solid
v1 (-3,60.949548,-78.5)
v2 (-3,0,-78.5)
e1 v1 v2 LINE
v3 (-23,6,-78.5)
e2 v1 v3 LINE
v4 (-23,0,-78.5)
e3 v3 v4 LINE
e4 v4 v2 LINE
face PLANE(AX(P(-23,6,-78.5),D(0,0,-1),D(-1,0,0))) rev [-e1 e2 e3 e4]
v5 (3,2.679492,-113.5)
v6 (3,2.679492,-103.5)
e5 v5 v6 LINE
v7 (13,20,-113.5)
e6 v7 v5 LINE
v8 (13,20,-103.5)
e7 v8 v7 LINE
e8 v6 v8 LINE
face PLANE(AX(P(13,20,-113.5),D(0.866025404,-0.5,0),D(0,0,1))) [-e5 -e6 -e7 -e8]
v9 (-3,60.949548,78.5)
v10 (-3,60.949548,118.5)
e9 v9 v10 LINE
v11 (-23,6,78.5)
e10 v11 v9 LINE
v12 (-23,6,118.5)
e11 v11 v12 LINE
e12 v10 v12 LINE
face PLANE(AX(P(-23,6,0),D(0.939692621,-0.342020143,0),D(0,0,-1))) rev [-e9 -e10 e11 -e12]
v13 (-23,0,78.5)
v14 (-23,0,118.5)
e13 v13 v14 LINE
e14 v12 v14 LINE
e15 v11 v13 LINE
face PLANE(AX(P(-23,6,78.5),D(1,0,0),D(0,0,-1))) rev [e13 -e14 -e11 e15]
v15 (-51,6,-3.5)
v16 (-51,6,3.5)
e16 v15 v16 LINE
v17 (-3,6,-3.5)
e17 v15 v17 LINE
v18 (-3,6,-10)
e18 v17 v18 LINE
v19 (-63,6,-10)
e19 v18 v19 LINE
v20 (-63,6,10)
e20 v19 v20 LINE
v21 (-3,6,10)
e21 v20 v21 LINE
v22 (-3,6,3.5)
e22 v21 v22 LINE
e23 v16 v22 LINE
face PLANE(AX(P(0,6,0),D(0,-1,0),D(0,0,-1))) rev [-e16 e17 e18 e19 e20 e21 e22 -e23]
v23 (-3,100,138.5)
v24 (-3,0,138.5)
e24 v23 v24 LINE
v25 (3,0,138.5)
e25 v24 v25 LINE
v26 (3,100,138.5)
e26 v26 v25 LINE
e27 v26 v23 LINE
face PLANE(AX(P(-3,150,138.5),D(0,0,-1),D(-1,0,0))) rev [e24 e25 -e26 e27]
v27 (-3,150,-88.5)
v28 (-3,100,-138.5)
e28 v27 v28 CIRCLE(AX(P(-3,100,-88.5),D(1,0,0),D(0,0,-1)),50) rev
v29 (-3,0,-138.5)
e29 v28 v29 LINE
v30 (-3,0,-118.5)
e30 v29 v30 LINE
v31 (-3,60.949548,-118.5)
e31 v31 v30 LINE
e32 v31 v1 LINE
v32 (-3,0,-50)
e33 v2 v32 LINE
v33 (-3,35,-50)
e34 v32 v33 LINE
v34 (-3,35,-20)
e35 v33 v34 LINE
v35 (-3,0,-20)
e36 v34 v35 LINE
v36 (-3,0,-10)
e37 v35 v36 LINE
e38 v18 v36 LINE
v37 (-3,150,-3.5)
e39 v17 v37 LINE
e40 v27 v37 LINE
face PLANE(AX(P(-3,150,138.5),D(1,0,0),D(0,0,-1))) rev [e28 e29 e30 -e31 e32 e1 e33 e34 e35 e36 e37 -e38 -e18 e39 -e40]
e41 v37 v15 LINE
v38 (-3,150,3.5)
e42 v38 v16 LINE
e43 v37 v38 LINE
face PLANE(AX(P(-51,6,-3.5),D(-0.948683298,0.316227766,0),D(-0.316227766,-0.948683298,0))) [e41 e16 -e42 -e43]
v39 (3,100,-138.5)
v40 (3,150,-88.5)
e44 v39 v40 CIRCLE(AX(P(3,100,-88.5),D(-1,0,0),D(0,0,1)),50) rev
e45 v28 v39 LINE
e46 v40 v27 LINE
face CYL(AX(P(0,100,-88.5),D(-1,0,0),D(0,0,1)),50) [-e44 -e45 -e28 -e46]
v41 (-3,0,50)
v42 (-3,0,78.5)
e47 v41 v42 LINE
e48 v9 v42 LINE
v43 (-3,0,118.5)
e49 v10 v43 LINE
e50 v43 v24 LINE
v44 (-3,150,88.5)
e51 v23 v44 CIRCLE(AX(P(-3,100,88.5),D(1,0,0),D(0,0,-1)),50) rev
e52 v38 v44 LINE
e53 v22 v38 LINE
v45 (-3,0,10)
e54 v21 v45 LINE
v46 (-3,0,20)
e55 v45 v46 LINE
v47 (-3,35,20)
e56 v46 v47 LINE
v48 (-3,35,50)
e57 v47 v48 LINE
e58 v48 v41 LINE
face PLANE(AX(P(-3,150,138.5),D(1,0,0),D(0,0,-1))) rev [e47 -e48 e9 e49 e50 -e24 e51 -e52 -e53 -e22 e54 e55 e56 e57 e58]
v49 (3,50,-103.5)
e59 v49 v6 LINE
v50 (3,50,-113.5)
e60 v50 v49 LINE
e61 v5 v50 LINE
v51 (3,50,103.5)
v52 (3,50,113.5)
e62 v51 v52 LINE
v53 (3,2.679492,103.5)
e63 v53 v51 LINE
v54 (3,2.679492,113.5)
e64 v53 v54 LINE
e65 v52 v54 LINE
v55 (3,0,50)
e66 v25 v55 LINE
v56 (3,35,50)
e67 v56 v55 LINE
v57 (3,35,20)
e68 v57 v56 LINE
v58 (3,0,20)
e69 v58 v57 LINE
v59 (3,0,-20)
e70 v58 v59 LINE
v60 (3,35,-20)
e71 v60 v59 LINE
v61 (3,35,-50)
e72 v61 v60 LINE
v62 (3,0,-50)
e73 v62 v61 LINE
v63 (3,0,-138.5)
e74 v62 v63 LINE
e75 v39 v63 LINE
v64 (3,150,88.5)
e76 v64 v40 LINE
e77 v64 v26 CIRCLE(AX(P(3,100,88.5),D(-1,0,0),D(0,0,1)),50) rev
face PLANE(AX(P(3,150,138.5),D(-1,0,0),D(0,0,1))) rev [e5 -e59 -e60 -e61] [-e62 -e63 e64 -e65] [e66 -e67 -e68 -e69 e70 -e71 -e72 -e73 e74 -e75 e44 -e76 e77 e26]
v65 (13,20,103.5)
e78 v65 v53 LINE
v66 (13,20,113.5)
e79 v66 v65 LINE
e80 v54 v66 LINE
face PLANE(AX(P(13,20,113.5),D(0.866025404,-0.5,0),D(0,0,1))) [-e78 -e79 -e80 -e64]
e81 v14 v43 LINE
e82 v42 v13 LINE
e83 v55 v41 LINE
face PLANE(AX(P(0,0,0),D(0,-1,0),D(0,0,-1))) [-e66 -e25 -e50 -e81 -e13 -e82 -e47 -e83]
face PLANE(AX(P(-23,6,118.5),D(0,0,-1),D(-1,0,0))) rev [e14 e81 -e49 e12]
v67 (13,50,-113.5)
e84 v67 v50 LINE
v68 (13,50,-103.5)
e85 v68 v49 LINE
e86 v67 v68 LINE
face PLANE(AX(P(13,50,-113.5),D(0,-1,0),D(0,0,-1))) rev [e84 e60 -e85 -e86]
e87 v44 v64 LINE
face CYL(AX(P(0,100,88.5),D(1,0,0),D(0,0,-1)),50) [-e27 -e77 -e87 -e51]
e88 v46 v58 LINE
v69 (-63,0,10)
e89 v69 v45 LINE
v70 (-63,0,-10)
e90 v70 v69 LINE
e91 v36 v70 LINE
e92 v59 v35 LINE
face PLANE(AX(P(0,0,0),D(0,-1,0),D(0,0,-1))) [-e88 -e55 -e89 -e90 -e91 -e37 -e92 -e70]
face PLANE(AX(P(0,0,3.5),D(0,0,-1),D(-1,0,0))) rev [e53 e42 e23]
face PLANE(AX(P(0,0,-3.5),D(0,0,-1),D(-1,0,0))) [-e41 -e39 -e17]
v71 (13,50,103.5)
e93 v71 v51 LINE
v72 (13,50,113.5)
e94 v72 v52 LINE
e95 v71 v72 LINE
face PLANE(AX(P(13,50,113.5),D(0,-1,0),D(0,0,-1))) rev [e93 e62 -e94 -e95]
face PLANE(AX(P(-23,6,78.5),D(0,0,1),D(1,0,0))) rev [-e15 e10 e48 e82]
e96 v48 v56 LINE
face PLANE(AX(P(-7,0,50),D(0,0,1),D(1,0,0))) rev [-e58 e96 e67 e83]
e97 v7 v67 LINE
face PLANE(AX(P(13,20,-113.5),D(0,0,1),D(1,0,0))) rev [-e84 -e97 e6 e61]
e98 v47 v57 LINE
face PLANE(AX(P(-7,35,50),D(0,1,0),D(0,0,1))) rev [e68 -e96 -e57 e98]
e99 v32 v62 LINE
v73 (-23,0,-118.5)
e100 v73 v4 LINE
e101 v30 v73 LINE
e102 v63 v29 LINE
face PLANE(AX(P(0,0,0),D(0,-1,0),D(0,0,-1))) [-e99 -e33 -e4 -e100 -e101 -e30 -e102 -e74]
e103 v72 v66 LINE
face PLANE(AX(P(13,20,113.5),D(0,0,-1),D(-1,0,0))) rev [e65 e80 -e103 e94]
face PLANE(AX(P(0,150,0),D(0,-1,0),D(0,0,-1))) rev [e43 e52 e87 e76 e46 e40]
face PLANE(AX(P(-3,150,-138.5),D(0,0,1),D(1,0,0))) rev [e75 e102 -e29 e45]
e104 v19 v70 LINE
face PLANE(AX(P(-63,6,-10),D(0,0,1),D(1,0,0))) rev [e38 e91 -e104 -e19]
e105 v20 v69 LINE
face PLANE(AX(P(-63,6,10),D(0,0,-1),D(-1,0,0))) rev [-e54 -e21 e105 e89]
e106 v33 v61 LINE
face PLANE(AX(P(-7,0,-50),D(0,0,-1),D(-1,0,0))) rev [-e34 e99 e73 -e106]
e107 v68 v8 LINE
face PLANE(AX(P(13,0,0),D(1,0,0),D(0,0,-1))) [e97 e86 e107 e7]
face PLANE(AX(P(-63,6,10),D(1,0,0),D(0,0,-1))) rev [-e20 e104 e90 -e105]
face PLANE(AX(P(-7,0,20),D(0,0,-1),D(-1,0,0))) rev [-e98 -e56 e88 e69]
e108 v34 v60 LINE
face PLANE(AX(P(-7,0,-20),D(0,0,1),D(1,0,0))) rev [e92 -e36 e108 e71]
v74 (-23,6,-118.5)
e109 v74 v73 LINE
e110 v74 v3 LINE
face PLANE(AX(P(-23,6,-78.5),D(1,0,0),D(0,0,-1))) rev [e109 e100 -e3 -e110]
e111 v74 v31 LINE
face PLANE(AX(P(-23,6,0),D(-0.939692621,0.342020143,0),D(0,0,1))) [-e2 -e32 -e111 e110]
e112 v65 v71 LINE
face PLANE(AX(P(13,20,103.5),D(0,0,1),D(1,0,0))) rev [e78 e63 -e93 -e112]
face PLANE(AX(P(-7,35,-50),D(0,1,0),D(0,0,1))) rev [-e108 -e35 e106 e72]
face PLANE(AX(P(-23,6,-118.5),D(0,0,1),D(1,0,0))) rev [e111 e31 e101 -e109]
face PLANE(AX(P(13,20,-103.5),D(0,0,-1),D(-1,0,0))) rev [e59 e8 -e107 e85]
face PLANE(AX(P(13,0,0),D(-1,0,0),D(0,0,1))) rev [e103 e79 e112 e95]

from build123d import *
from OCP.BRepFilletAPI import BRepFilletAPI_MakeChamfer

# Parameters (mm, degrees)
SKETCH_1_W          = 6
SKETCH_1_H          = 277
EXTRUDE_1_DEPTH     = 150
SKETCH_2_W          = 20
SKETCH_2_H          = 40
SKETCH_2_W_2        = 60
SKETCH_2_H_2        = 20
EXTRUDE_2_DEPTH     = 6
EXTRUDE_3_DEPTH     = 7
CHAMFER_2_SIZE      = 54.949548389
CHAMFER_2_SIZE_2    = 20
SKETCH_5_W          = 10
SKETCH_5_H          = 30
EXTRUDE_4_DEPTH     = 10
CHAMFER_3_SIZE      = 17.320508076
CHAMFER_3_SIZE_2    = 10
SKETCH_6_W          = 30
SKETCH_6_H          = 35
CUT_EXTRUDE_1_DEPTH = 10
FILLET_2_R          = 50


with BuildPart() as part:
    # Эскиз1 → Бобышка-Вытянуть1 (new body)
    with BuildSketch(Plane(origin=(0, 0, 0), x_dir=(1, 0, 0), z_dir=(0, 1, 0))):
        Rectangle(SKETCH_1_W, SKETCH_1_H)
    extrude(amount=EXTRUDE_1_DEPTH)

    # Эскиз2 → Бобышка-Вытянуть2 (add)
    with BuildSketch(Plane(origin=(0, 0, 0), x_dir=(1, 0, 0), z_dir=(0, 1, 0))):
        with Locations((-13, 98.5)):
            Rectangle(SKETCH_2_W, SKETCH_2_H)
        with Locations((-13, -98.5)):
            Rectangle(SKETCH_2_W, SKETCH_2_H)
        with Locations((-33, 0)):
            Rectangle(SKETCH_2_W_2, SKETCH_2_H_2)
    extrude(amount=EXTRUDE_2_DEPTH)

    # Эскиз3 → Бобышка-Вытянуть3 (add)
    with BuildSketch(Plane.XY.offset(3.5)):
        Polygon((-3, 6), (-51, 6), (-3, 150), align=None)
    extrude(amount=-EXTRUDE_3_DEPTH)

    # Фаска2
    chamfer_2_edges_1 = [part.edges().sort_by_distance(p)[0] for p in [
        (-3, 6, 98.5),
    ]]
    chamfer_2_side_1 = [part.faces().sort_by_distance(p)[0] for p in [
        (-3, 6.4, 98.5),
    ]]
    chamfer_2_edges_2 = [part.edges().sort_by_distance(p)[0] for p in [
        (-3, 6, -98.5),
    ]]
    chamfer_2_side_2 = [part.faces().sort_by_distance(p)[0] for p in [
        (-3, 6.4, -98.5),
    ]]
    chamfer_2 = BRepFilletAPI_MakeChamfer(part.part.solid().wrapped)
    for e in chamfer_2_edges_1:
        chamfer_2.Add(CHAMFER_2_SIZE - 0.0001, CHAMFER_2_SIZE_2 - 0.0001, e.wrapped, chamfer_2_side_1[0].wrapped)
    for e in chamfer_2_edges_2:
        chamfer_2.Add(CHAMFER_2_SIZE - 0.0001, CHAMFER_2_SIZE_2 - 0.0001, e.wrapped, chamfer_2_side_2[0].wrapped)
    add(Compound.cast(chamfer_2.Shape()), mode=Mode.REPLACE)  # a hair under: the kernel refuses the full size

    # Эскиз5 → Бобышка-Вытянуть4 (add)
    with BuildSketch(Plane(origin=(3, 0, 0), x_dir=(0, 0, -1), z_dir=(1, 0, 0))):
        with Locations((-108.5, 35)):
            Rectangle(SKETCH_5_W, SKETCH_5_H)
        with Locations((108.5, 35)):
            Rectangle(SKETCH_5_W, SKETCH_5_H)
    extrude(amount=EXTRUDE_4_DEPTH)

    # Фаска3
    chamfer_3_edges_1 = [part.edges().sort_by_distance(p)[0] for p in [
        (3, 20, 108.5),
    ]]
    chamfer_3_side_1 = [part.faces().sort_by_distance(p)[0] for p in [
        (3, 19.8, 108.5),
    ]]
    chamfer_3_edges_2 = [part.edges().sort_by_distance(p)[0] for p in [
        (3, 20, -108.5),
    ]]
    chamfer_3_side_2 = [part.faces().sort_by_distance(p)[0] for p in [
        (3, 19.8, -108.5),
    ]]
    chamfer_3 = BRepFilletAPI_MakeChamfer(part.part.solid().wrapped)
    for e in chamfer_3_edges_1:
        chamfer_3.Add(CHAMFER_3_SIZE - 0.0001, CHAMFER_3_SIZE_2 - 0.0001, e.wrapped, chamfer_3_side_1[0].wrapped)
    for e in chamfer_3_edges_2:
        chamfer_3.Add(CHAMFER_3_SIZE - 0.0001, CHAMFER_3_SIZE_2 - 0.0001, e.wrapped, chamfer_3_side_2[0].wrapped)
    add(Compound.cast(chamfer_3.Shape()), mode=Mode.REPLACE)  # a hair under: the kernel refuses the full size

    # Эскиз6 → Вырез-Вытянуть1 (cut)
    with BuildSketch(Plane(origin=(3, 0, 0), x_dir=(0, 0, -1), z_dir=(1, 0, 0))):
        with Locations((-35, 17.5)):
            Rectangle(SKETCH_6_W, SKETCH_6_H)
        with Locations((35, 17.5)):
            Rectangle(SKETCH_6_W, SKETCH_6_H)
    extrude(amount=-CUT_EXTRUDE_1_DEPTH, mode=Mode.SUBTRACT)

    # Скругление2
    fillet_2_edges = [part.edges().sort_by_distance(p)[0] for p in [
        (0, 150, 138.5),
        (0, 150, -138.5),
    ]]
    fillet(fillet_2_edges, radius=FILLET_2_R)


solid = part.part
